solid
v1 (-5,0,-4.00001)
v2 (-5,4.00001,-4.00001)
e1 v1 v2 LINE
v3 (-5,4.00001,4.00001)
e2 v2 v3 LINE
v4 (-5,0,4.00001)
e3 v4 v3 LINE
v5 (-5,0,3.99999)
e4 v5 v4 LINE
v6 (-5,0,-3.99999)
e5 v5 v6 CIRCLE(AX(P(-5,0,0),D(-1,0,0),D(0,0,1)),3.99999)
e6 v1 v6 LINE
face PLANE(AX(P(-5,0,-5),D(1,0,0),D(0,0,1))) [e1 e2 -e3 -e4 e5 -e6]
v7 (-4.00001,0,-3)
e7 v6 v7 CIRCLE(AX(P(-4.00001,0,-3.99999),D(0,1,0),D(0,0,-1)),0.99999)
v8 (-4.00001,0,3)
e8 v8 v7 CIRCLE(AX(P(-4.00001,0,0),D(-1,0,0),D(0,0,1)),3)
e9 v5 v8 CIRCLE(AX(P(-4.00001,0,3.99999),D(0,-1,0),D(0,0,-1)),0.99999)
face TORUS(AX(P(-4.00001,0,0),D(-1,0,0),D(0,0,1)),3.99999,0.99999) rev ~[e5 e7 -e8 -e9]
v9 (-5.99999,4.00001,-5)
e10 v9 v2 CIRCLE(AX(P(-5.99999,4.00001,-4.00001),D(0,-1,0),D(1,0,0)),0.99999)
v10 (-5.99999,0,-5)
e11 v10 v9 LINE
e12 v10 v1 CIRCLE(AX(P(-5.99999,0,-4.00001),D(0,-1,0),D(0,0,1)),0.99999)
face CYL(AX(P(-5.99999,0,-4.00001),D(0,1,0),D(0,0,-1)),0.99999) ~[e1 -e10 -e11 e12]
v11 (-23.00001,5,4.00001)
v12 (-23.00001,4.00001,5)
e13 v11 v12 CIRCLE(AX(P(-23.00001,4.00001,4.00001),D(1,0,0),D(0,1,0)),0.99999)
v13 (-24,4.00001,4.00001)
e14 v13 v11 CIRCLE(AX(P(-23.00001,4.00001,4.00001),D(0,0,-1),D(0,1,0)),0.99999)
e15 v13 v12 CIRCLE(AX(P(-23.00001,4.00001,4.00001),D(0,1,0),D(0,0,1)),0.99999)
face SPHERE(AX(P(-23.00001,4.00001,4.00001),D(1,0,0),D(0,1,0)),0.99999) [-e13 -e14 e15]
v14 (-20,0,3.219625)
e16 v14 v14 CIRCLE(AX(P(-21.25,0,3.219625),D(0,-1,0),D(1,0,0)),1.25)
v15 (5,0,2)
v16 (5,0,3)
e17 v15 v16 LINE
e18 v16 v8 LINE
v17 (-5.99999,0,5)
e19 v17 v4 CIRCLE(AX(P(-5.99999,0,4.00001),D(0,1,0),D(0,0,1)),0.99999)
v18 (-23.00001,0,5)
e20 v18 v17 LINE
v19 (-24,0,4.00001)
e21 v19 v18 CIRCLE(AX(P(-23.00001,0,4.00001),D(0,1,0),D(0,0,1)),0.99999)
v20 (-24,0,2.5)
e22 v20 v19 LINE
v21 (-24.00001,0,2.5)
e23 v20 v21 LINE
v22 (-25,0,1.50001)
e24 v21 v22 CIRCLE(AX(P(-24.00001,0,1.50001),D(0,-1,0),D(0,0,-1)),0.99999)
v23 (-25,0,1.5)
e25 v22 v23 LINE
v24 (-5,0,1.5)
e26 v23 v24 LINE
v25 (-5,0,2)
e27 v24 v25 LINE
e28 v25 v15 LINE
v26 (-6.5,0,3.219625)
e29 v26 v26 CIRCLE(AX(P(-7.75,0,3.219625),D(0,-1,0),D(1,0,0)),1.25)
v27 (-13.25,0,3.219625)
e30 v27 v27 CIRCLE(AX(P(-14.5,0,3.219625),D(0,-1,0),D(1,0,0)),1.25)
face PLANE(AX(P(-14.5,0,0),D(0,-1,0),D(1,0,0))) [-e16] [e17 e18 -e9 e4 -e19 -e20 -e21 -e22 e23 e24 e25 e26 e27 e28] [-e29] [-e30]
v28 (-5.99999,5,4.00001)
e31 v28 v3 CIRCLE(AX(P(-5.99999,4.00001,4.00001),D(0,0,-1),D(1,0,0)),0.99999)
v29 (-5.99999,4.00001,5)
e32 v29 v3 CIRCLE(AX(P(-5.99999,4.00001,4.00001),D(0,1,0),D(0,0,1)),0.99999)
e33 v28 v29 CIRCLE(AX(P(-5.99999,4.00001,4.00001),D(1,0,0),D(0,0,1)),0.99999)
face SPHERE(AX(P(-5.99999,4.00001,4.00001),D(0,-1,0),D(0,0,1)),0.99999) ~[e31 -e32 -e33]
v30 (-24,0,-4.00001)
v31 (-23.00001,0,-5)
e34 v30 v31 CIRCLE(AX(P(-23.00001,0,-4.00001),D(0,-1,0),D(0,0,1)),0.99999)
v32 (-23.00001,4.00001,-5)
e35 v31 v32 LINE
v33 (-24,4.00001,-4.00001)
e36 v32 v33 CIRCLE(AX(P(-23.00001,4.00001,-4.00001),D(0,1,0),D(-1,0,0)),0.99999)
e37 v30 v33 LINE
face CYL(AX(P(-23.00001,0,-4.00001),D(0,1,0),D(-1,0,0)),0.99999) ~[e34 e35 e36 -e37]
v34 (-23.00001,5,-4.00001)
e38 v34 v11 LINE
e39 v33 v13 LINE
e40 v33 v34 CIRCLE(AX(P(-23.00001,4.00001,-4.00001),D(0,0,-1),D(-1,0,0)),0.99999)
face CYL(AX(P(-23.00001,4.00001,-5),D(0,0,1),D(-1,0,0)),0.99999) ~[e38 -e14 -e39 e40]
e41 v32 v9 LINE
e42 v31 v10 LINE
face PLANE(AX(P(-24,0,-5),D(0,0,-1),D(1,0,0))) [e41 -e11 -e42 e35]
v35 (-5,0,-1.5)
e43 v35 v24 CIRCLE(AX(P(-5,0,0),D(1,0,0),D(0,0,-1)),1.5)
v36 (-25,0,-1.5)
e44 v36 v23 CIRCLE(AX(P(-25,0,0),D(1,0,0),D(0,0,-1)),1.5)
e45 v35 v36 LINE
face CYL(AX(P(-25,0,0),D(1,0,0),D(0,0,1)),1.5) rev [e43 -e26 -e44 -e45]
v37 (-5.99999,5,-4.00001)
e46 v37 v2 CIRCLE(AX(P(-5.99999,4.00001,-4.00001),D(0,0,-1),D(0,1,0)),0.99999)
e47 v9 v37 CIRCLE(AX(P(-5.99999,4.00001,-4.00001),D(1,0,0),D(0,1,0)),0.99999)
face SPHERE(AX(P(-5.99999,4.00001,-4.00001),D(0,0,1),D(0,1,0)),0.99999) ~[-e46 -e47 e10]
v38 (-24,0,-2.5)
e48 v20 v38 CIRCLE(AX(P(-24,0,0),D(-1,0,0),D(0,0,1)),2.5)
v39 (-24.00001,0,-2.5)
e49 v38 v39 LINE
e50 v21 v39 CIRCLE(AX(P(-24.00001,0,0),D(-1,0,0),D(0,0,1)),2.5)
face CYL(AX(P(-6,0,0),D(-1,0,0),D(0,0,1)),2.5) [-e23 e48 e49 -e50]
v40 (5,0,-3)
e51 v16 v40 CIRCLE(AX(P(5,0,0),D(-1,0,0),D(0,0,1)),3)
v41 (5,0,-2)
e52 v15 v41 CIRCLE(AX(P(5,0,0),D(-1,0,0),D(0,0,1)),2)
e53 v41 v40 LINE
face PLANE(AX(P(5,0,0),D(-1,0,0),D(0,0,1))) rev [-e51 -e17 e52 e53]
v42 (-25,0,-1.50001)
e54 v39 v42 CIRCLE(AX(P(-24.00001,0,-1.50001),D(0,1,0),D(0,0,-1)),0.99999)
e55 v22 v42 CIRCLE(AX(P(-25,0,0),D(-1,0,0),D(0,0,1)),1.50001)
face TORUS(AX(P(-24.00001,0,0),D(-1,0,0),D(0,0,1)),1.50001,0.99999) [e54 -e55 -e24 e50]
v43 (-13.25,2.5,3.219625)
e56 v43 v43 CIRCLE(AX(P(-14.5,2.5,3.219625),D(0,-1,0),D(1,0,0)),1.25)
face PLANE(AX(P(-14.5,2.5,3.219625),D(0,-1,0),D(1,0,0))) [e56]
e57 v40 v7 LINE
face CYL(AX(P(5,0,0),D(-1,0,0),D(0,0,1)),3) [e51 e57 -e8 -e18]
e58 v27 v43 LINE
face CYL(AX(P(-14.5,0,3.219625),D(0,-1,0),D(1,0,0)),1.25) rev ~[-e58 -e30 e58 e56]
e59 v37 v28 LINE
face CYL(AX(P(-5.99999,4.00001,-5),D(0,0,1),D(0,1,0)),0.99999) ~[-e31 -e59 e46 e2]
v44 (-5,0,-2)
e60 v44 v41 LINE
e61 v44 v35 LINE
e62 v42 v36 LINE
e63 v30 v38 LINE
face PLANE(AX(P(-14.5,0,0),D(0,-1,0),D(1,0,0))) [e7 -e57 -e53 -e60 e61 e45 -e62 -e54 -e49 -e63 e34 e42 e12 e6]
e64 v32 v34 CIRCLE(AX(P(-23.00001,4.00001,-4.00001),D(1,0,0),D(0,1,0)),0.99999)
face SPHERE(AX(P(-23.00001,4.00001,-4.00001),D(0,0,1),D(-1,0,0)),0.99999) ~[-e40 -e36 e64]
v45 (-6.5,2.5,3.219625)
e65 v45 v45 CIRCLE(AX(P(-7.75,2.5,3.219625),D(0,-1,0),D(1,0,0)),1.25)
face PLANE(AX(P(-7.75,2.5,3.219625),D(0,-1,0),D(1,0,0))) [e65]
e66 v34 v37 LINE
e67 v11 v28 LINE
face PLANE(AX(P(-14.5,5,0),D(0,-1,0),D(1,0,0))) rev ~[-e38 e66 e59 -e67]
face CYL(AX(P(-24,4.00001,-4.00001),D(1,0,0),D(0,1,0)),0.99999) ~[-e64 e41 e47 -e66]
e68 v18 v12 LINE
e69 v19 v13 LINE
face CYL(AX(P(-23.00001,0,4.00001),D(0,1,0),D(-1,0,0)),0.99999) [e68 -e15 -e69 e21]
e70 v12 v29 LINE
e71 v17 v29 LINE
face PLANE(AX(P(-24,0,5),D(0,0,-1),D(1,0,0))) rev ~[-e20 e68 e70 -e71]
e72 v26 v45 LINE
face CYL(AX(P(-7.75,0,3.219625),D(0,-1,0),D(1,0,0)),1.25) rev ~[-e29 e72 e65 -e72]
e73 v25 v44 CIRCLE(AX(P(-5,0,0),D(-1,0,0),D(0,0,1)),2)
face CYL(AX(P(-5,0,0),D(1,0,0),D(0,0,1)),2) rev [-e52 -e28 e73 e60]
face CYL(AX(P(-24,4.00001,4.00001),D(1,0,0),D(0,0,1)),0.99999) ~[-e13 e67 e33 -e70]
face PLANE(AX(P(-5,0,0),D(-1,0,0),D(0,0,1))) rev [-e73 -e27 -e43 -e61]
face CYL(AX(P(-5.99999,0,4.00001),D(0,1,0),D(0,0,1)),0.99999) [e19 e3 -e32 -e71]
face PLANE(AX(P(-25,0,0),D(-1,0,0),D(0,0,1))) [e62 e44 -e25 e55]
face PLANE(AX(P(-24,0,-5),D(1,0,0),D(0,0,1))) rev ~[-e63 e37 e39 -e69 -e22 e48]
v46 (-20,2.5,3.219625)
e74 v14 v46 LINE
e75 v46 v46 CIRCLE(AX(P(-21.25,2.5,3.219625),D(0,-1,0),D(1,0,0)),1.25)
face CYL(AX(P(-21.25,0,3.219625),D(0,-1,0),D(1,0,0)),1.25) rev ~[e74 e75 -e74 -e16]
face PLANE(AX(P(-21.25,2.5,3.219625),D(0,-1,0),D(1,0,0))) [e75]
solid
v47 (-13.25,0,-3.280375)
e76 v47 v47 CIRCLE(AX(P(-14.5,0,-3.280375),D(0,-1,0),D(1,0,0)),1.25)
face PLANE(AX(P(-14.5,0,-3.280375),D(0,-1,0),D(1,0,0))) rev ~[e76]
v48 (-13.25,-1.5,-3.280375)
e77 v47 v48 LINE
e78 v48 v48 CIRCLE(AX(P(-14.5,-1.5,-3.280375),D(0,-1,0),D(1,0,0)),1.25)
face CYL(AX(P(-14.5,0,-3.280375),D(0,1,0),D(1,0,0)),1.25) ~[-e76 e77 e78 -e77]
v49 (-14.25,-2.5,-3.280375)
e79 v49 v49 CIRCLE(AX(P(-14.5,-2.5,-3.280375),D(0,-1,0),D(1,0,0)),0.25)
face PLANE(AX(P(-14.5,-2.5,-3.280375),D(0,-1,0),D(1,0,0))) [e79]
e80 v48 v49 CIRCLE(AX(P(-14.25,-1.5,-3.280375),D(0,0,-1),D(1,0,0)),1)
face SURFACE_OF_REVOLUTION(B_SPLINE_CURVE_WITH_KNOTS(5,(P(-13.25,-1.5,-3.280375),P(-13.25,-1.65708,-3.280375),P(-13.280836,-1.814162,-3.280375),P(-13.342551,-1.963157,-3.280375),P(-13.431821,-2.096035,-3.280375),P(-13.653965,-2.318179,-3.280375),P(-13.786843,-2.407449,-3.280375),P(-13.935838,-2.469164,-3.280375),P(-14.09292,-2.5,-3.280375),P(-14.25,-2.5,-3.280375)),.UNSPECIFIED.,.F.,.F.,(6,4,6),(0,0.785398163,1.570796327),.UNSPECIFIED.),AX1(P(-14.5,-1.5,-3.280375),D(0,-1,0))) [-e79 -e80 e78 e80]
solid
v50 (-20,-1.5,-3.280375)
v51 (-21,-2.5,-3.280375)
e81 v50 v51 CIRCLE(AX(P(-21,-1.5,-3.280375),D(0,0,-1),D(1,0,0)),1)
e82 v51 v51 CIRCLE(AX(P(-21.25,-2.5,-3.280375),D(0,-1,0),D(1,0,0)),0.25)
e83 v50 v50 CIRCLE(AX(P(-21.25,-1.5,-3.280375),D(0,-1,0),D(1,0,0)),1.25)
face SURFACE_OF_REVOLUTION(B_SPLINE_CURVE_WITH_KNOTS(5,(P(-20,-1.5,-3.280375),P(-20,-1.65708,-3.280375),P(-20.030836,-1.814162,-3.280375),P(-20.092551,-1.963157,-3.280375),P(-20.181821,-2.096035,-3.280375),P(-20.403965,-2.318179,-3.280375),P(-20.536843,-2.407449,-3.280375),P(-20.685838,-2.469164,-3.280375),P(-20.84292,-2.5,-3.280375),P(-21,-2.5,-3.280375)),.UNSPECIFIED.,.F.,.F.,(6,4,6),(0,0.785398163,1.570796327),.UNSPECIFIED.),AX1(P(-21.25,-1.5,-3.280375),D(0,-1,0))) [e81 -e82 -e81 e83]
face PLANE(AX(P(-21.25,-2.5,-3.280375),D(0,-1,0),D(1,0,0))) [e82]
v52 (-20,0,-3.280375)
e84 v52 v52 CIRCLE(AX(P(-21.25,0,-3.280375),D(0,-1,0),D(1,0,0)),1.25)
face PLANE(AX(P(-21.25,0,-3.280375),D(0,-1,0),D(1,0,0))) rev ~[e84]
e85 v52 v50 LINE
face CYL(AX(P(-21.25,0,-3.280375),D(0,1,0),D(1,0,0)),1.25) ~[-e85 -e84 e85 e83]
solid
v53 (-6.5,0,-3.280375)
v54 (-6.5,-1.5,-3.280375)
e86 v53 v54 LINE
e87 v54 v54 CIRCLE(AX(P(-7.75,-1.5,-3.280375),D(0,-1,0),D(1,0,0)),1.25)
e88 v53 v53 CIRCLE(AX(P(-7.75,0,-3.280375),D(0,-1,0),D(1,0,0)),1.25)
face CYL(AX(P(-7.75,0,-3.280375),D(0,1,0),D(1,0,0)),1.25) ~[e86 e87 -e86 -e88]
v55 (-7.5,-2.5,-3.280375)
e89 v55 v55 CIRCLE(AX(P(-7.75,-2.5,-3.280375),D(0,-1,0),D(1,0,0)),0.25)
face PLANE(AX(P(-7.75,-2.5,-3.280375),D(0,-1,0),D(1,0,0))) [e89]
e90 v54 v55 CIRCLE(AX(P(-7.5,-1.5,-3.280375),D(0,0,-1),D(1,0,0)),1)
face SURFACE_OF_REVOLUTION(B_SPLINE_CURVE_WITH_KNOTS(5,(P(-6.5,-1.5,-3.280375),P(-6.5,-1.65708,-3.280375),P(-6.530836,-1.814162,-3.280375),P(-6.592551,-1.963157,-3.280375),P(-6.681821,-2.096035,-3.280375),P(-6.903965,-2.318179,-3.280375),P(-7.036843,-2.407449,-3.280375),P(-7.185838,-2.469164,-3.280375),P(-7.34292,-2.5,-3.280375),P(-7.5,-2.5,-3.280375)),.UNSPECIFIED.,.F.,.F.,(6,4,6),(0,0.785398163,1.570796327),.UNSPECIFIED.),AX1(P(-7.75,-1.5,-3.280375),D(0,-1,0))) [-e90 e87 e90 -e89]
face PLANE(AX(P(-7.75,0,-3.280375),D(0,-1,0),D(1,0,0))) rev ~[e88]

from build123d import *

# Parameters (mm, degrees)
F1_ANGLE = 180
F2_W     = 19
F2_H     = 10
F3_DEPTH = 5
F4_R     = 1.5
F5_DEPTH = 25
F6_R     = 1.25
F7_DEPTH = 2.5
F8_DEPTH = 2.5
F9_R     = 0.99999
F10_R    = 0.99999
F11_R    = 1
F11_2_R  = 1
F11_3_R  = 1


# Not quite as in the source:
# - a fillet or chamfer is up to 0.001 mm smaller than in the source, because OpenCascade refuses the exact size


with BuildPart() as f1:
    # F0 (on Front) → F1 (revolve)
    with BuildSketch(Plane.XZ):
        Polygon((-5, 2), (5, 2), (5, 3), (-5.9999994636, 3), (-6, 2.5), (-25, 2.5), (-25, 1.5), (-5, 1.5), align=None)
    revolve(axis=Axis((-10, 0, 0), (-1, 0, 0)), revolution_arc=F1_ANGLE)

    # F2 (on Front) → F3 (join)
    with BuildSketch(Plane.XZ):
        with Locations((-14.5, 0)):
            Rectangle(F2_W, F2_H)
    extrude(amount=-F3_DEPTH)

    # F4 (on Right) → F5 (cut)
    with BuildSketch(Plane.YZ):
        Circle(F4_R)
    extrude(amount=-F5_DEPTH, mode=Mode.SUBTRACT)

    # F6 (on Front) → F7 (cut)
    with BuildSketch(Plane.XZ):
        with Locations((-21.25, 3.2196251888)):
            Circle(F6_R)
        with Locations((-14.5, 3.2196251888)):
            Circle(F6_R)
        with Locations((-7.75, 3.2196251888)):
            Circle(F6_R)
    extrude(amount=-F7_DEPTH, mode=Mode.SUBTRACT)

    # F9 (radius 1 in the source; OpenCascade refuses exactly that, so slightly less here)
    f9_edges = [f1.edges().sort_by_distance(p)[0] for p in [
        (-5, 2.5, 5),
        (-14.5, 5, 5),
        (-5, 5, 0),
        (-24, 5, 0),
        (-24, 2.5, 5),
        (-24, 2.5, -5),
        (-14.5, 5, -5),
        (-5, 2.5, -5),
        (-5, 3, 0),
    ]]
    fillet(f9_edges, radius=F9_R)

    # F10 (radius 1 in the source; OpenCascade refuses exactly that, so slightly less here)
    f10_edges = [f1.edges().sort_by_distance(p)[0] for p in [
        (-25, 2.5, 0),
    ]]
    fillet(f10_edges, radius=F10_R)


with BuildPart() as f8:
    # F6 (on Front) → F8 (new body)
    with BuildSketch(Plane.XZ):
        with Locations((-21.25, -3.2803748112)):
            Circle(F6_R)
    extrude(amount=F8_DEPTH)

    # F11
    f11_edges = [f8.edges().sort_by_distance(p)[0] for p in [
        (-22.5, -2.5, -3.280375),
    ]]
    fillet(f11_edges, radius=F11_R)


with BuildPart() as f8b:
    # F6 (on Front) → F8, piece 2 (new body)
    with BuildSketch(Plane.XZ):
        with Locations((-14.5, -3.2803748112)):
            Circle(F6_R)
    extrude(amount=F8_DEPTH)

    # F11#2
    f11_2_edges = [f8b.edges().sort_by_distance(p)[0] for p in [
        (-15.75, -2.5, -3.280375),
    ]]
    fillet(f11_2_edges, radius=F11_2_R)


with BuildPart() as f8c:
    # F6 (on Front) → F8, piece 3 (new body)
    with BuildSketch(Plane.XZ):
        with Locations((-7.75, -3.2803748112)):
            Circle(F6_R)
    extrude(amount=F8_DEPTH)

    # F11#3
    f11_3_edges = [f8c.edges().sort_by_distance(p)[0] for p in [
        (-9, -2.5, -3.280375),
    ]]
    fillet(f11_3_edges, radius=F11_3_R)


solid = Compound([f1.part, f8.part, f8b.part, f8c.part])
